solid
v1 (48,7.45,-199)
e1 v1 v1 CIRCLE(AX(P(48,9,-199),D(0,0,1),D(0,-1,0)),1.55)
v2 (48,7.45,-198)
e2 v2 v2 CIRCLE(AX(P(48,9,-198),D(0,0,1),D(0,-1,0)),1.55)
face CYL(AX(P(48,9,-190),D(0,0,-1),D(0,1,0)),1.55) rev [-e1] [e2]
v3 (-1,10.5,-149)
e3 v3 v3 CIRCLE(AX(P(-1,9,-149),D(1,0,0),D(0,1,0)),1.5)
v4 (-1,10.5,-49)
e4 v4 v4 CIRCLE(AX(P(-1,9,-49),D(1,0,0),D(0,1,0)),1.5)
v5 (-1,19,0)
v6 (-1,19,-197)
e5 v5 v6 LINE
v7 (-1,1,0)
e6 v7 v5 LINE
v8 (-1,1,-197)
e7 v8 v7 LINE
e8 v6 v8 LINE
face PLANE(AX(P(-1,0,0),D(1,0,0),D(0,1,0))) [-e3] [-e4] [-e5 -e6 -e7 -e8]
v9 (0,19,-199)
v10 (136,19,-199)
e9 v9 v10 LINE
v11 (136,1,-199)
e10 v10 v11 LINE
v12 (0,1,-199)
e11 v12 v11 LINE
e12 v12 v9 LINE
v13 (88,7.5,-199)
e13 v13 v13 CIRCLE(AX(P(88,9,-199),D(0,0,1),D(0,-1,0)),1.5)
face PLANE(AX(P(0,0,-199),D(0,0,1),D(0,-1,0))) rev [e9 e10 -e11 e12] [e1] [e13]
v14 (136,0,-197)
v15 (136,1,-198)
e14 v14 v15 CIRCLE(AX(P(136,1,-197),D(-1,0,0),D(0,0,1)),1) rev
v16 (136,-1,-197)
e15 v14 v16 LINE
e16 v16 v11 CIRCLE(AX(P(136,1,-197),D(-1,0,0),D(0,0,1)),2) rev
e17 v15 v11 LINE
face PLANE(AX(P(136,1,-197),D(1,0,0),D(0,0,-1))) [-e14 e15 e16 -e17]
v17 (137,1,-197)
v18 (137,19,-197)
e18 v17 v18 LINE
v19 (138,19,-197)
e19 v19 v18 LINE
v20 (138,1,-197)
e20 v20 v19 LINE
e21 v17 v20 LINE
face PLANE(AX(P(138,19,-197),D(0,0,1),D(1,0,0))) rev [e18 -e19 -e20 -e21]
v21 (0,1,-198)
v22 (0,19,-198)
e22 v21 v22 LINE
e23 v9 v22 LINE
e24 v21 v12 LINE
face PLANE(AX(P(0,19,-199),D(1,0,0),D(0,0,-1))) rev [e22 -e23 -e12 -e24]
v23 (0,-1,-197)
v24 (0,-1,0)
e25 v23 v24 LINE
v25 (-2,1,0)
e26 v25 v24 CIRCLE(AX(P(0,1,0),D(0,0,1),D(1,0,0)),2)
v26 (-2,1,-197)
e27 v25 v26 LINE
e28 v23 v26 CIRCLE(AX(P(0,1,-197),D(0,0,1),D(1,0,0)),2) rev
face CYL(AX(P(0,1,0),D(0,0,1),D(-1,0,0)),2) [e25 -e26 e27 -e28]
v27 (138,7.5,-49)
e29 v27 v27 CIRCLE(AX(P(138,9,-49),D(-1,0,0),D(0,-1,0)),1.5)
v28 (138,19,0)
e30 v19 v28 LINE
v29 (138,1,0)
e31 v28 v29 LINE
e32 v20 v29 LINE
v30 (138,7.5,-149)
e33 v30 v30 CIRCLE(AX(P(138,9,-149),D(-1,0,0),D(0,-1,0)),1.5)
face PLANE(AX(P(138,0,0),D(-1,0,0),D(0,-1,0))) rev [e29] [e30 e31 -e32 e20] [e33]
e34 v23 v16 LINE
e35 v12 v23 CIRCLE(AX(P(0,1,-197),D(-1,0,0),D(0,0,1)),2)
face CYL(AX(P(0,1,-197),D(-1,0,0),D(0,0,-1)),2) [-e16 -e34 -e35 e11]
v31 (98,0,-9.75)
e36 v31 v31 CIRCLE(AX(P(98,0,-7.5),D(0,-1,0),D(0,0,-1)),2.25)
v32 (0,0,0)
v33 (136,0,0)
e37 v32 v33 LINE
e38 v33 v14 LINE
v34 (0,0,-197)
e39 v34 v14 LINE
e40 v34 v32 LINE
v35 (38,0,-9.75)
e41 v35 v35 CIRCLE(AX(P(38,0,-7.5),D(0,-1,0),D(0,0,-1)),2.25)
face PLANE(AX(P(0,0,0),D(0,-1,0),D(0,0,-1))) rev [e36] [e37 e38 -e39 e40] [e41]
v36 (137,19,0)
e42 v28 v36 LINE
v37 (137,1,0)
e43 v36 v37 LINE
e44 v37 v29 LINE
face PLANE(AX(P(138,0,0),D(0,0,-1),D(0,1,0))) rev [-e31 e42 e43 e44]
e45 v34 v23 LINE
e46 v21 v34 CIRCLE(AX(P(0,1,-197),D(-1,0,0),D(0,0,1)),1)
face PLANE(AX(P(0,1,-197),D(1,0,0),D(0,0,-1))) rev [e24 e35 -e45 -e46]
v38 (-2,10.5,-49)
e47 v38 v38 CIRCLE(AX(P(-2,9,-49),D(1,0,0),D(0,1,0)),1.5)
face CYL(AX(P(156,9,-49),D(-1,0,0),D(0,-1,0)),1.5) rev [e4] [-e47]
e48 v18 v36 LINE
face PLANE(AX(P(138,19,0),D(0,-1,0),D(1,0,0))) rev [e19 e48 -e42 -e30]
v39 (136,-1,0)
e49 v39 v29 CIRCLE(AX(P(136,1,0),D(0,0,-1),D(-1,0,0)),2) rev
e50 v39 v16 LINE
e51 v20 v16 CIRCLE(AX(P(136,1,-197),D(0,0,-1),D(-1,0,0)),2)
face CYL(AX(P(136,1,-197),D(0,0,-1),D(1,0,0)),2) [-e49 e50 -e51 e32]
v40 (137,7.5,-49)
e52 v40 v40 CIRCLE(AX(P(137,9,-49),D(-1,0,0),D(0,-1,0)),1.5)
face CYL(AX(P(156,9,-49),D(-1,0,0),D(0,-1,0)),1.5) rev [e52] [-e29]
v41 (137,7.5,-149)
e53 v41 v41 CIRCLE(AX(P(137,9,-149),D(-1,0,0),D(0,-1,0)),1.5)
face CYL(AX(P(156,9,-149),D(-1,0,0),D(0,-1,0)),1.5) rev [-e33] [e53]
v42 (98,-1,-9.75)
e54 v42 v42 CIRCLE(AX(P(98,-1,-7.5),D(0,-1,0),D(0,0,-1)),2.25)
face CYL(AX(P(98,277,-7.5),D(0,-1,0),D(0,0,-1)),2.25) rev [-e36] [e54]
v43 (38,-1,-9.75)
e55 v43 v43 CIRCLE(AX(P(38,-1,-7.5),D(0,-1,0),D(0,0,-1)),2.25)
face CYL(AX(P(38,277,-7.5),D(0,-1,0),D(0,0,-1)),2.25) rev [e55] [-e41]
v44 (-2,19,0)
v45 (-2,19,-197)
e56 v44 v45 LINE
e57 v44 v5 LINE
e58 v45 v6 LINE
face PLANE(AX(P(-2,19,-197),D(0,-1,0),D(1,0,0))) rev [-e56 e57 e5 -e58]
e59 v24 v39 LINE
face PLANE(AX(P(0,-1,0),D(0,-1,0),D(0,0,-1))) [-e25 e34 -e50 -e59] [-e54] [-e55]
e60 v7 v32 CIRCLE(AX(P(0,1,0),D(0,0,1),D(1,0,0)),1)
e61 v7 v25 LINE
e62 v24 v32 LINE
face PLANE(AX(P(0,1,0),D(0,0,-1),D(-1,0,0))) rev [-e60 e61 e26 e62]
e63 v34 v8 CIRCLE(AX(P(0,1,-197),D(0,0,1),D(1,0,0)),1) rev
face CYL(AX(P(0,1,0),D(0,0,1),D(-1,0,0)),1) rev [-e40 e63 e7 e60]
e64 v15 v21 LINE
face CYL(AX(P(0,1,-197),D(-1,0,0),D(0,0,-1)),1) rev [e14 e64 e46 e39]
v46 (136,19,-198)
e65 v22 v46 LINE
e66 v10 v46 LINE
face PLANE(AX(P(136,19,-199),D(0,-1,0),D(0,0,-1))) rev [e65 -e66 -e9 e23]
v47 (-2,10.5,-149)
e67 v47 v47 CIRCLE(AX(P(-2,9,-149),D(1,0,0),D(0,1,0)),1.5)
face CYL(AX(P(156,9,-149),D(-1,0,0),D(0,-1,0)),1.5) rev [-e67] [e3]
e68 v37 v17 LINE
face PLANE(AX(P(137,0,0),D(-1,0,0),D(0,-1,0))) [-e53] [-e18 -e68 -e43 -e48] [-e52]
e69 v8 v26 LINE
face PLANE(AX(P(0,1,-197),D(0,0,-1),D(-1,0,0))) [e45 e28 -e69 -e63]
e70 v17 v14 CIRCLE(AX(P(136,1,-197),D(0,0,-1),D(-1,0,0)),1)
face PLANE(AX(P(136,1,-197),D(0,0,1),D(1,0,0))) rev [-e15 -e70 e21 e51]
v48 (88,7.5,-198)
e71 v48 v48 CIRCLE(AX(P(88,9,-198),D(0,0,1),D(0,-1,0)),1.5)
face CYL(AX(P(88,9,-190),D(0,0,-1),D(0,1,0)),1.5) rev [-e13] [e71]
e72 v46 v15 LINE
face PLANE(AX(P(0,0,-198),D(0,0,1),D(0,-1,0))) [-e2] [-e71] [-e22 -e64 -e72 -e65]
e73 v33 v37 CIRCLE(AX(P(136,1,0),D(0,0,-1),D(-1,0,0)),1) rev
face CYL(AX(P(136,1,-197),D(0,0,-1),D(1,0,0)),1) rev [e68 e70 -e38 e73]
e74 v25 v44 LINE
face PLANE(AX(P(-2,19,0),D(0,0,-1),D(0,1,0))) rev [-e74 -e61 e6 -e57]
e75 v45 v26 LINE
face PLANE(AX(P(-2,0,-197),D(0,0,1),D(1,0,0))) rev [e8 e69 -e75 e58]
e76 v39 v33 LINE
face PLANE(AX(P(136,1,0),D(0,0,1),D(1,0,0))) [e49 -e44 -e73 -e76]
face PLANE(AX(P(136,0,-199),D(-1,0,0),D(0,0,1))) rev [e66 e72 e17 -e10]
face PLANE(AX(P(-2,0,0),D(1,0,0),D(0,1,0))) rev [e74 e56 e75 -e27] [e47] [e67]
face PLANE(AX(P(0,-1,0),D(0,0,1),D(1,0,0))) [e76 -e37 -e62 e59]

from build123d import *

# Parameters (mm, degrees)
SKETCH1_W                    = 136
SKETCH1_H                    = 198
BASE_FLANGE1_DEPTH           = 1
EDGE_FLANGE1_STRIP_W         = 6
EDGE_FLANGE1_STRIP_H         = 1
EDGE_FLANGE1_STRIP_CUT_DEPTH = 136
EDGE_FLANGE1_DEPTH           = 136
EDGE_FLANGE2_DEPTH           = 197
EDGE_FLANGE3_DEPTH           = 197
CUT_EXTRUDE1_DEPTH           = 515.988593157
CUT_EXTRUDE1_DEPTH_BACK      = 159
SKETCH18_R                   = 1.5
SKETCH21_R                   = 2.25
CUT_EXTRUDE2_DEPTH           = 278
SKETCH26_R                   = 1.5
CUT_EXTRUDE7_DEPTH           = 10
SKETCH33_R                   = 1.55
CUT_EXTRUDE14_DEPTH          = 10


# Sheet-metal steps are written as plain solids
with BuildPart() as part:
    # Sketch1 → Base-Flange1 (new body)
    with BuildSketch(Plane(origin=(0, 0, 0), x_dir=(1, 0, 0), z_dir=(0, 1, 0))):
        with Locations((68, 99)):
            Rectangle(SKETCH1_W, SKETCH1_H)
    extrude(amount=-BASE_FLANGE1_DEPTH)

    # Edge-Flange1 strip (across the edge) → Edge-Flange1 strip cut (cut)
    with BuildSketch(Plane(origin=(136, 0, -198), x_dir=(0, 0, 1), z_dir=(-1, 0, 0))):
        with Locations((-2, -0.5)):
            Rectangle(EDGE_FLANGE1_STRIP_W, EDGE_FLANGE1_STRIP_H)
    extrude(amount=EDGE_FLANGE1_STRIP_CUT_DEPTH, mode=Mode.SUBTRACT)

    # Edge-Flange1 section (across the edge) → Edge-Flange1 (add)
    with BuildSketch(Plane(origin=(136, 0, -198), x_dir=(0, 0, 1), z_dir=(-1, 0, 0))):
        with BuildLine():
            Line((-1, 1), (-1, 19))
            Line((-1, 19), (0, 19))
            Line((0, 19), (0, 1))
            ThreePointArc((0, 1), (0.292893219, 0.292893219), (1, 0))
            Line((1, 0), (1, -1))
            ThreePointArc((1, -1), (-0.414213562, -0.414213562), (-1, 1))
        make_face()
    extrude(amount=EDGE_FLANGE1_DEPTH)

    # Edge-Flange2 section (across the edge) → Edge-Flange2 (add)
    with BuildSketch(Plane(origin=(137, 0, 0), x_dir=(-1, 0, 0), z_dir=(0, 0, -1))):
        with BuildLine():
            Line((-1, 1), (-1, 19))
            Line((-1, 19), (0, 19))
            Line((0, 19), (0, 1))
            ThreePointArc((0, 1), (0.292893219, 0.292893219), (1, 0))
            Line((1, 0), (1, -1))
            ThreePointArc((1, -1), (-0.414213562, -0.414213562), (-1, 1))
        make_face()
    extrude(amount=EDGE_FLANGE2_DEPTH)

    # Edge-Flange3 section (across the edge) → Edge-Flange3 (add)
    with BuildSketch(Plane(origin=(-1, 0, -197), x_dir=(1, 0, 0), z_dir=(0, 0, 1))):
        with BuildLine():
            Line((-1, 1), (-1, 19))
            Line((-1, 19), (0, 19))
            Line((0, 19), (0, 1))
            ThreePointArc((0, 1), (0.292893219, 0.292893219), (1, 0))
            Line((1, 0), (1, -1))
            ThreePointArc((1, -1), (-0.414213562, -0.414213562), (-1, 1))
        make_face()
    extrude(amount=EDGE_FLANGE3_DEPTH)

    # Sketch18 → Cut-Extrude1 (cut, two sides: drawn at the far end of the back side and taken through both)
    with BuildSketch(Plane(origin=(-3, 352.051657269, -347.400026456), x_dir=(0, 0, -1), z_dir=(-1, 0, 0)).offset(-CUT_EXTRUDE1_DEPTH_BACK)):
        with Locations(Location((-298.400026456, 343.051657269, 0), (0, 0, 270))):
            Circle(SKETCH18_R)
        with Locations(Location((-198.400026456, 343.051657269, 0), (0, 0, 270))):
            Circle(SKETCH18_R)
    extrude(amount=CUT_EXTRUDE1_DEPTH + CUT_EXTRUDE1_DEPTH_BACK, mode=Mode.SUBTRACT)

    # Sketch21 → Cut-Extrude2 (cut)
    with BuildSketch(Plane(origin=(-57.062536038, -1, -347.400026456), x_dir=(0, 0, 1), z_dir=(0, -1, 0))):
        with Locations(Location((339.900026456, -95.062536038, 0), (0, 0, 180))):
            Circle(SKETCH21_R)
        with Locations(Location((339.900026456, -155.062536038, 0), (0, 0, 180))):
            Circle(SKETCH21_R)
    extrude(amount=-CUT_EXTRUDE2_DEPTH, mode=Mode.SUBTRACT)

    # Sketch26 → Cut-Extrude7 (cut)
    with BuildSketch(Plane(origin=(-57.062536038, 352.051657269, -200), x_dir=(1, 0, 0), z_dir=(0, 0, -1))):
        with Locations(Location((105.062536038, 343.051657269, 0), (0, 0, 90))):
            Circle(SKETCH26_R)
        with Locations(Location((145.062536038, 343.051657269, 0), (0, 0, 90))):
            Circle(SKETCH26_R)
    extrude(amount=-CUT_EXTRUDE7_DEPTH, mode=Mode.SUBTRACT)

    # Sketch33 → Cut-Extrude14 (cut)
    with BuildSketch(Plane(origin=(193.062536038, -94.051657269, -200), x_dir=(-1, 0, 0), z_dir=(0, 0, -1))):
        with Locations(Location((145.062536038, 103.051657269, 0), (0, 0, 270))):
            Circle(SKETCH33_R)
    extrude(amount=-CUT_EXTRUDE14_DEPTH, mode=Mode.SUBTRACT)


solid = part.part
